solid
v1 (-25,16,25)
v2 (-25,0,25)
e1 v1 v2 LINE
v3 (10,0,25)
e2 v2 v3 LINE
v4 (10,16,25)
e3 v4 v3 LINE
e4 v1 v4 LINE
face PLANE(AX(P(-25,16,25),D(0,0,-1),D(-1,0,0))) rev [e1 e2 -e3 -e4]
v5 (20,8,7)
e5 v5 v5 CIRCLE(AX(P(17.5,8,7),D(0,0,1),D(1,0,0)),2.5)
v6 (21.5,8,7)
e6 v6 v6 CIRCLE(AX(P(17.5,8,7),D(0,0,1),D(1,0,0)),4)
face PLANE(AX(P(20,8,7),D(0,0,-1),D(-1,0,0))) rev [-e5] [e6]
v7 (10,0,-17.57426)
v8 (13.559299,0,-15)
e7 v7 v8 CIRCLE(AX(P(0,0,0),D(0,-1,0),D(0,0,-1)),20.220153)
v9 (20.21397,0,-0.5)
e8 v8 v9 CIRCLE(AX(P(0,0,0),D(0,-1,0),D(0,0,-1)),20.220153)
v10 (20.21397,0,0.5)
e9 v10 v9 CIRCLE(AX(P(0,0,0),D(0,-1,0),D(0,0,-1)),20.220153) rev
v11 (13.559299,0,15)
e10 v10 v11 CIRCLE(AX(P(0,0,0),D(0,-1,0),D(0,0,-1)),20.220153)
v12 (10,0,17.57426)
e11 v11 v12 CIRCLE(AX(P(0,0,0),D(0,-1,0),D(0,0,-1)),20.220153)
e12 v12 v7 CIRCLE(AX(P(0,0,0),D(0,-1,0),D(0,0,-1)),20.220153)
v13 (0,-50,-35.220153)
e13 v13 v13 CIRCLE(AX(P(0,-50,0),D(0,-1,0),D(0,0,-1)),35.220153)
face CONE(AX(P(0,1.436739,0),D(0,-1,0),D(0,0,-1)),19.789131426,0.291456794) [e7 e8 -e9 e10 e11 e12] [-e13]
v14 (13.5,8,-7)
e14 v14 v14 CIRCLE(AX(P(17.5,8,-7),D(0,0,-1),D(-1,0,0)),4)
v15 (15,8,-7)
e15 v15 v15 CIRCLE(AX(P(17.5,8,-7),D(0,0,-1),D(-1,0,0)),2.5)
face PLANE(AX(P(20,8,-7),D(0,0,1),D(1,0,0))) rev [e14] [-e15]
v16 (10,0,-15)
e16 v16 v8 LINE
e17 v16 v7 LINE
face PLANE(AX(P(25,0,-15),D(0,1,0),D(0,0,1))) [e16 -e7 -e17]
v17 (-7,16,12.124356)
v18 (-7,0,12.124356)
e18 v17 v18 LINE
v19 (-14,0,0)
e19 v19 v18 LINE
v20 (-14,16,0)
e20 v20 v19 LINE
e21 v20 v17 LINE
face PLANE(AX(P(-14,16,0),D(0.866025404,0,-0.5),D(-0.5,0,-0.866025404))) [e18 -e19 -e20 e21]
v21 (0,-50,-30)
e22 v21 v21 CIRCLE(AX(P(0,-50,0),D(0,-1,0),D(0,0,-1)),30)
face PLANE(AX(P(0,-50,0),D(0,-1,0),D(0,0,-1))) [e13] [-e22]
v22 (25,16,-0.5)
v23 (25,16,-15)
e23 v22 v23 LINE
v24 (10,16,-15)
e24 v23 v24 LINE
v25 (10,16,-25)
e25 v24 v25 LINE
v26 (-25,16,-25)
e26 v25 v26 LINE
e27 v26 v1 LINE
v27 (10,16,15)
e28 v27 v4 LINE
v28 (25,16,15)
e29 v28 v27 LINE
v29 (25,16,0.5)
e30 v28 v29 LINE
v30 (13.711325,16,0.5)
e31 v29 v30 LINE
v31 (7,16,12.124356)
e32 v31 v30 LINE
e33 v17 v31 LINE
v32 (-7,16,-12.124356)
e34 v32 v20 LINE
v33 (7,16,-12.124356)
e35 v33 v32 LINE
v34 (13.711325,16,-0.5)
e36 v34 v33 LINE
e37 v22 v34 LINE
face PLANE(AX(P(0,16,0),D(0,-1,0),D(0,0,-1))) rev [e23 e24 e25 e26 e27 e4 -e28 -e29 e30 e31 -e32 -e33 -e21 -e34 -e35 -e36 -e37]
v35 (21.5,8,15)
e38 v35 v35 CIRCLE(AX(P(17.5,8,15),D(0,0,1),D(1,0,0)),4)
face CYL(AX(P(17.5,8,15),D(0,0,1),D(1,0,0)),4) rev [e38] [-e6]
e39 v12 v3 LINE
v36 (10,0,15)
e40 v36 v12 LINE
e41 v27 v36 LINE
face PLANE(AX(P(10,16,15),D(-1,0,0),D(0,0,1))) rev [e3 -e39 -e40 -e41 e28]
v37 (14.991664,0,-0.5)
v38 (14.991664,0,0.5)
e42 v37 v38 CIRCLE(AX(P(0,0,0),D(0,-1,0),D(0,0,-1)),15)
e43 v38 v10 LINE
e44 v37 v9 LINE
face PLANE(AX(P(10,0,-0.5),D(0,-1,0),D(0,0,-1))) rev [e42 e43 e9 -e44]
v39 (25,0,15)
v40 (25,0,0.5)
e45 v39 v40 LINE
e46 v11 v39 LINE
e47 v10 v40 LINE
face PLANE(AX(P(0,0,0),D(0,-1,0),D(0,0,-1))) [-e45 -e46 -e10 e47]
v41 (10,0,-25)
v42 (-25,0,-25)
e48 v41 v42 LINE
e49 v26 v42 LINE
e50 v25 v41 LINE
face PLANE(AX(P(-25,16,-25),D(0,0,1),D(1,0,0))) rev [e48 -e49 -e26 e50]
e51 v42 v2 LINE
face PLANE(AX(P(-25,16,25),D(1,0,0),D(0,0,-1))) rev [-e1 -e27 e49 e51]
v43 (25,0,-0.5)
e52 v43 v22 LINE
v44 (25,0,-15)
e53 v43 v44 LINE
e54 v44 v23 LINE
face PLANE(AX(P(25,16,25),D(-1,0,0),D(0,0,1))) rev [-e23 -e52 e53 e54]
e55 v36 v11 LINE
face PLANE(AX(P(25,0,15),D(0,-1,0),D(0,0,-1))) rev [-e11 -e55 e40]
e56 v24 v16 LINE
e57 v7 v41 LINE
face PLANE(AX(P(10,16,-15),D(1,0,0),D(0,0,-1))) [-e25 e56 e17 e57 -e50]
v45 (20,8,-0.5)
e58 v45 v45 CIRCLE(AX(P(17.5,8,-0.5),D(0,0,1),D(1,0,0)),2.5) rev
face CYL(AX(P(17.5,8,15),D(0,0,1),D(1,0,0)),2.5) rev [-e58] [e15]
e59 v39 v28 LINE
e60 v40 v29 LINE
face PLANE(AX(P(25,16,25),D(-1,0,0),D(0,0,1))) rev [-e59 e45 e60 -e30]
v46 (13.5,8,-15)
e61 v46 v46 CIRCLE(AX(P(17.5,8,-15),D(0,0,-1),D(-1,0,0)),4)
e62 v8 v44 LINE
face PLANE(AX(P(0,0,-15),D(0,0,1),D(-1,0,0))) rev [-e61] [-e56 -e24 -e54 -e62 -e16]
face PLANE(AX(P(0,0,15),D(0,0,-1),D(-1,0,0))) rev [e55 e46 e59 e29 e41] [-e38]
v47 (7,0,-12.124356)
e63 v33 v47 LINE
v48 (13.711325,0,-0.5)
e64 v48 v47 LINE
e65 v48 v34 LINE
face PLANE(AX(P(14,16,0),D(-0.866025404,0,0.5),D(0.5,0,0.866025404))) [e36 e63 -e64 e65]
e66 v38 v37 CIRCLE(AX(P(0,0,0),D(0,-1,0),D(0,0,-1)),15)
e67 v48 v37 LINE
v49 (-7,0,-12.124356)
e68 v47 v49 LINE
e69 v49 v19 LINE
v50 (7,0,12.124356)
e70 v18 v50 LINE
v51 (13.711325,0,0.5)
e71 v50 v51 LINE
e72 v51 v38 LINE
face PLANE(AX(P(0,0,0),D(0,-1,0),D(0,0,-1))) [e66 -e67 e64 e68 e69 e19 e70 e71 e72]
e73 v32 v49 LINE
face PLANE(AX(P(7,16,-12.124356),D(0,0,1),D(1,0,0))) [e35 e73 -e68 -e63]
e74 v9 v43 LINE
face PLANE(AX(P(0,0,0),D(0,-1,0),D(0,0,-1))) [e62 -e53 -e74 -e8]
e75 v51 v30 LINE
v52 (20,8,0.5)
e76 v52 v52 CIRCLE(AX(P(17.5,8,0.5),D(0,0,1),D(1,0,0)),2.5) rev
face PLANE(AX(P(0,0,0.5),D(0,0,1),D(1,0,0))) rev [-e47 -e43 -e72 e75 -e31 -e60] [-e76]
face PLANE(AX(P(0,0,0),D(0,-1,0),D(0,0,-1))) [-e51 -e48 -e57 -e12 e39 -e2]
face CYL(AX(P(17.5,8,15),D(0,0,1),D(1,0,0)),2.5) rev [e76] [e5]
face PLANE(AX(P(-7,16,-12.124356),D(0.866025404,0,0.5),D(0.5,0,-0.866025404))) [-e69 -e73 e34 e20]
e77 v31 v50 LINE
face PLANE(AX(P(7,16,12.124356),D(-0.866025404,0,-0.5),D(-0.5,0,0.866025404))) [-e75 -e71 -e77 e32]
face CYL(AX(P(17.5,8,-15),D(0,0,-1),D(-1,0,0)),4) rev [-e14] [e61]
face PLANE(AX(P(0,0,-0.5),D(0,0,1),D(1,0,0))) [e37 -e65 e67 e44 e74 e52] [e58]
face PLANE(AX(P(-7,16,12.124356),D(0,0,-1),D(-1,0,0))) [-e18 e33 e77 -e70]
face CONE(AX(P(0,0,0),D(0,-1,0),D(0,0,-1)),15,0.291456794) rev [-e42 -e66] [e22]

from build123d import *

# Parameters (mm, degrees)
SKETCH2_W                      = 50
SKETCH2_H                      = 50
BOSS_EXTRUDE1_DEPTH            = 16
SKETCH9_W                      = 15
SKETCH9_H                      = 16
CUT_EXTRUDE2_DEPTH             = 10
CBORE_FOR_M4_SHCS2_D           = 5
CBORE_FOR_M4_SHCS2_CBORE_D     = 8
CBORE_FOR_M4_SHCS2_CBORE_DEPTH = 8
SKETCH13_W                     = 15
SKETCH13_H                     = 16
CUT_EXTRUDE5_DEPTH             = 0.5


# Read off the part's stored shape, not the designer's step: Loft-Thin1
with BuildPart() as part:
    # Sketch2 → Boss-Extrude1 (new body)
    with BuildSketch(Plane(origin=(0, 0, 0), x_dir=(1, 0, 0), z_dir=(0, 1, 0))):
        Rectangle(SKETCH2_W, SKETCH2_H)
        Polygon((14, 0), (7, 12.124355653), (-7, 12.124355653), (-14, 0), (-7, -12.124355653), (7, -12.124355653), align=None, mode=Mode.SUBTRACT)
    extrude(amount=BOSS_EXTRUDE1_DEPTH)

    # Loft-Thin1 outline → Loft-Thin1 (revolve)
    with BuildSketch(Plane.XY):
        Polygon((30, -50), (35.220153254, -50), (20.220153254, 0), (15, 0), align=None)
    revolve(axis=Axis((0, 0, 0), (0, 1, 0)))

    # Sketch9 → Cut-Extrude2 (cut)
    with BuildSketch(Plane.XY.offset(25)):
        with Locations((17.5, 8)):
            Rectangle(SKETCH9_W, SKETCH9_H)
    cut_extrude2 = extrude(amount=-CUT_EXTRUDE2_DEPTH, mode=Mode.SUBTRACT)

    # Mirror2: Cut-Extrude2 across plane
    add(cut_extrude2.mirror(Plane.XY), mode=Mode.SUBTRACT)

    # CBORE for M4 SHCS2 (through all)
    with Locations(Plane(origin=(17.5, 8, 15), x_dir=(1, 0, 0), z_dir=(0, 0, 1))):
        with Locations((0, 0)):
            cbore_for_m4_shcs2 = CounterBoreHole(CBORE_FOR_M4_SHCS2_D / 2, CBORE_FOR_M4_SHCS2_CBORE_D / 2, CBORE_FOR_M4_SHCS2_CBORE_DEPTH)

    # Mirror3: CBORE for M4 SHCS2 across plane
    add(cbore_for_m4_shcs2.mirror(Plane.XY), mode=Mode.SUBTRACT)

    # Sketch13 → Cut-Extrude5 (cut, symmetric)
    with BuildSketch(Plane.XY):
        with Locations((17.5, 8)):
            Rectangle(SKETCH13_W, SKETCH13_H)
    extrude(amount=CUT_EXTRUDE5_DEPTH, both=True, mode=Mode.SUBTRACT)


solid = part.part
